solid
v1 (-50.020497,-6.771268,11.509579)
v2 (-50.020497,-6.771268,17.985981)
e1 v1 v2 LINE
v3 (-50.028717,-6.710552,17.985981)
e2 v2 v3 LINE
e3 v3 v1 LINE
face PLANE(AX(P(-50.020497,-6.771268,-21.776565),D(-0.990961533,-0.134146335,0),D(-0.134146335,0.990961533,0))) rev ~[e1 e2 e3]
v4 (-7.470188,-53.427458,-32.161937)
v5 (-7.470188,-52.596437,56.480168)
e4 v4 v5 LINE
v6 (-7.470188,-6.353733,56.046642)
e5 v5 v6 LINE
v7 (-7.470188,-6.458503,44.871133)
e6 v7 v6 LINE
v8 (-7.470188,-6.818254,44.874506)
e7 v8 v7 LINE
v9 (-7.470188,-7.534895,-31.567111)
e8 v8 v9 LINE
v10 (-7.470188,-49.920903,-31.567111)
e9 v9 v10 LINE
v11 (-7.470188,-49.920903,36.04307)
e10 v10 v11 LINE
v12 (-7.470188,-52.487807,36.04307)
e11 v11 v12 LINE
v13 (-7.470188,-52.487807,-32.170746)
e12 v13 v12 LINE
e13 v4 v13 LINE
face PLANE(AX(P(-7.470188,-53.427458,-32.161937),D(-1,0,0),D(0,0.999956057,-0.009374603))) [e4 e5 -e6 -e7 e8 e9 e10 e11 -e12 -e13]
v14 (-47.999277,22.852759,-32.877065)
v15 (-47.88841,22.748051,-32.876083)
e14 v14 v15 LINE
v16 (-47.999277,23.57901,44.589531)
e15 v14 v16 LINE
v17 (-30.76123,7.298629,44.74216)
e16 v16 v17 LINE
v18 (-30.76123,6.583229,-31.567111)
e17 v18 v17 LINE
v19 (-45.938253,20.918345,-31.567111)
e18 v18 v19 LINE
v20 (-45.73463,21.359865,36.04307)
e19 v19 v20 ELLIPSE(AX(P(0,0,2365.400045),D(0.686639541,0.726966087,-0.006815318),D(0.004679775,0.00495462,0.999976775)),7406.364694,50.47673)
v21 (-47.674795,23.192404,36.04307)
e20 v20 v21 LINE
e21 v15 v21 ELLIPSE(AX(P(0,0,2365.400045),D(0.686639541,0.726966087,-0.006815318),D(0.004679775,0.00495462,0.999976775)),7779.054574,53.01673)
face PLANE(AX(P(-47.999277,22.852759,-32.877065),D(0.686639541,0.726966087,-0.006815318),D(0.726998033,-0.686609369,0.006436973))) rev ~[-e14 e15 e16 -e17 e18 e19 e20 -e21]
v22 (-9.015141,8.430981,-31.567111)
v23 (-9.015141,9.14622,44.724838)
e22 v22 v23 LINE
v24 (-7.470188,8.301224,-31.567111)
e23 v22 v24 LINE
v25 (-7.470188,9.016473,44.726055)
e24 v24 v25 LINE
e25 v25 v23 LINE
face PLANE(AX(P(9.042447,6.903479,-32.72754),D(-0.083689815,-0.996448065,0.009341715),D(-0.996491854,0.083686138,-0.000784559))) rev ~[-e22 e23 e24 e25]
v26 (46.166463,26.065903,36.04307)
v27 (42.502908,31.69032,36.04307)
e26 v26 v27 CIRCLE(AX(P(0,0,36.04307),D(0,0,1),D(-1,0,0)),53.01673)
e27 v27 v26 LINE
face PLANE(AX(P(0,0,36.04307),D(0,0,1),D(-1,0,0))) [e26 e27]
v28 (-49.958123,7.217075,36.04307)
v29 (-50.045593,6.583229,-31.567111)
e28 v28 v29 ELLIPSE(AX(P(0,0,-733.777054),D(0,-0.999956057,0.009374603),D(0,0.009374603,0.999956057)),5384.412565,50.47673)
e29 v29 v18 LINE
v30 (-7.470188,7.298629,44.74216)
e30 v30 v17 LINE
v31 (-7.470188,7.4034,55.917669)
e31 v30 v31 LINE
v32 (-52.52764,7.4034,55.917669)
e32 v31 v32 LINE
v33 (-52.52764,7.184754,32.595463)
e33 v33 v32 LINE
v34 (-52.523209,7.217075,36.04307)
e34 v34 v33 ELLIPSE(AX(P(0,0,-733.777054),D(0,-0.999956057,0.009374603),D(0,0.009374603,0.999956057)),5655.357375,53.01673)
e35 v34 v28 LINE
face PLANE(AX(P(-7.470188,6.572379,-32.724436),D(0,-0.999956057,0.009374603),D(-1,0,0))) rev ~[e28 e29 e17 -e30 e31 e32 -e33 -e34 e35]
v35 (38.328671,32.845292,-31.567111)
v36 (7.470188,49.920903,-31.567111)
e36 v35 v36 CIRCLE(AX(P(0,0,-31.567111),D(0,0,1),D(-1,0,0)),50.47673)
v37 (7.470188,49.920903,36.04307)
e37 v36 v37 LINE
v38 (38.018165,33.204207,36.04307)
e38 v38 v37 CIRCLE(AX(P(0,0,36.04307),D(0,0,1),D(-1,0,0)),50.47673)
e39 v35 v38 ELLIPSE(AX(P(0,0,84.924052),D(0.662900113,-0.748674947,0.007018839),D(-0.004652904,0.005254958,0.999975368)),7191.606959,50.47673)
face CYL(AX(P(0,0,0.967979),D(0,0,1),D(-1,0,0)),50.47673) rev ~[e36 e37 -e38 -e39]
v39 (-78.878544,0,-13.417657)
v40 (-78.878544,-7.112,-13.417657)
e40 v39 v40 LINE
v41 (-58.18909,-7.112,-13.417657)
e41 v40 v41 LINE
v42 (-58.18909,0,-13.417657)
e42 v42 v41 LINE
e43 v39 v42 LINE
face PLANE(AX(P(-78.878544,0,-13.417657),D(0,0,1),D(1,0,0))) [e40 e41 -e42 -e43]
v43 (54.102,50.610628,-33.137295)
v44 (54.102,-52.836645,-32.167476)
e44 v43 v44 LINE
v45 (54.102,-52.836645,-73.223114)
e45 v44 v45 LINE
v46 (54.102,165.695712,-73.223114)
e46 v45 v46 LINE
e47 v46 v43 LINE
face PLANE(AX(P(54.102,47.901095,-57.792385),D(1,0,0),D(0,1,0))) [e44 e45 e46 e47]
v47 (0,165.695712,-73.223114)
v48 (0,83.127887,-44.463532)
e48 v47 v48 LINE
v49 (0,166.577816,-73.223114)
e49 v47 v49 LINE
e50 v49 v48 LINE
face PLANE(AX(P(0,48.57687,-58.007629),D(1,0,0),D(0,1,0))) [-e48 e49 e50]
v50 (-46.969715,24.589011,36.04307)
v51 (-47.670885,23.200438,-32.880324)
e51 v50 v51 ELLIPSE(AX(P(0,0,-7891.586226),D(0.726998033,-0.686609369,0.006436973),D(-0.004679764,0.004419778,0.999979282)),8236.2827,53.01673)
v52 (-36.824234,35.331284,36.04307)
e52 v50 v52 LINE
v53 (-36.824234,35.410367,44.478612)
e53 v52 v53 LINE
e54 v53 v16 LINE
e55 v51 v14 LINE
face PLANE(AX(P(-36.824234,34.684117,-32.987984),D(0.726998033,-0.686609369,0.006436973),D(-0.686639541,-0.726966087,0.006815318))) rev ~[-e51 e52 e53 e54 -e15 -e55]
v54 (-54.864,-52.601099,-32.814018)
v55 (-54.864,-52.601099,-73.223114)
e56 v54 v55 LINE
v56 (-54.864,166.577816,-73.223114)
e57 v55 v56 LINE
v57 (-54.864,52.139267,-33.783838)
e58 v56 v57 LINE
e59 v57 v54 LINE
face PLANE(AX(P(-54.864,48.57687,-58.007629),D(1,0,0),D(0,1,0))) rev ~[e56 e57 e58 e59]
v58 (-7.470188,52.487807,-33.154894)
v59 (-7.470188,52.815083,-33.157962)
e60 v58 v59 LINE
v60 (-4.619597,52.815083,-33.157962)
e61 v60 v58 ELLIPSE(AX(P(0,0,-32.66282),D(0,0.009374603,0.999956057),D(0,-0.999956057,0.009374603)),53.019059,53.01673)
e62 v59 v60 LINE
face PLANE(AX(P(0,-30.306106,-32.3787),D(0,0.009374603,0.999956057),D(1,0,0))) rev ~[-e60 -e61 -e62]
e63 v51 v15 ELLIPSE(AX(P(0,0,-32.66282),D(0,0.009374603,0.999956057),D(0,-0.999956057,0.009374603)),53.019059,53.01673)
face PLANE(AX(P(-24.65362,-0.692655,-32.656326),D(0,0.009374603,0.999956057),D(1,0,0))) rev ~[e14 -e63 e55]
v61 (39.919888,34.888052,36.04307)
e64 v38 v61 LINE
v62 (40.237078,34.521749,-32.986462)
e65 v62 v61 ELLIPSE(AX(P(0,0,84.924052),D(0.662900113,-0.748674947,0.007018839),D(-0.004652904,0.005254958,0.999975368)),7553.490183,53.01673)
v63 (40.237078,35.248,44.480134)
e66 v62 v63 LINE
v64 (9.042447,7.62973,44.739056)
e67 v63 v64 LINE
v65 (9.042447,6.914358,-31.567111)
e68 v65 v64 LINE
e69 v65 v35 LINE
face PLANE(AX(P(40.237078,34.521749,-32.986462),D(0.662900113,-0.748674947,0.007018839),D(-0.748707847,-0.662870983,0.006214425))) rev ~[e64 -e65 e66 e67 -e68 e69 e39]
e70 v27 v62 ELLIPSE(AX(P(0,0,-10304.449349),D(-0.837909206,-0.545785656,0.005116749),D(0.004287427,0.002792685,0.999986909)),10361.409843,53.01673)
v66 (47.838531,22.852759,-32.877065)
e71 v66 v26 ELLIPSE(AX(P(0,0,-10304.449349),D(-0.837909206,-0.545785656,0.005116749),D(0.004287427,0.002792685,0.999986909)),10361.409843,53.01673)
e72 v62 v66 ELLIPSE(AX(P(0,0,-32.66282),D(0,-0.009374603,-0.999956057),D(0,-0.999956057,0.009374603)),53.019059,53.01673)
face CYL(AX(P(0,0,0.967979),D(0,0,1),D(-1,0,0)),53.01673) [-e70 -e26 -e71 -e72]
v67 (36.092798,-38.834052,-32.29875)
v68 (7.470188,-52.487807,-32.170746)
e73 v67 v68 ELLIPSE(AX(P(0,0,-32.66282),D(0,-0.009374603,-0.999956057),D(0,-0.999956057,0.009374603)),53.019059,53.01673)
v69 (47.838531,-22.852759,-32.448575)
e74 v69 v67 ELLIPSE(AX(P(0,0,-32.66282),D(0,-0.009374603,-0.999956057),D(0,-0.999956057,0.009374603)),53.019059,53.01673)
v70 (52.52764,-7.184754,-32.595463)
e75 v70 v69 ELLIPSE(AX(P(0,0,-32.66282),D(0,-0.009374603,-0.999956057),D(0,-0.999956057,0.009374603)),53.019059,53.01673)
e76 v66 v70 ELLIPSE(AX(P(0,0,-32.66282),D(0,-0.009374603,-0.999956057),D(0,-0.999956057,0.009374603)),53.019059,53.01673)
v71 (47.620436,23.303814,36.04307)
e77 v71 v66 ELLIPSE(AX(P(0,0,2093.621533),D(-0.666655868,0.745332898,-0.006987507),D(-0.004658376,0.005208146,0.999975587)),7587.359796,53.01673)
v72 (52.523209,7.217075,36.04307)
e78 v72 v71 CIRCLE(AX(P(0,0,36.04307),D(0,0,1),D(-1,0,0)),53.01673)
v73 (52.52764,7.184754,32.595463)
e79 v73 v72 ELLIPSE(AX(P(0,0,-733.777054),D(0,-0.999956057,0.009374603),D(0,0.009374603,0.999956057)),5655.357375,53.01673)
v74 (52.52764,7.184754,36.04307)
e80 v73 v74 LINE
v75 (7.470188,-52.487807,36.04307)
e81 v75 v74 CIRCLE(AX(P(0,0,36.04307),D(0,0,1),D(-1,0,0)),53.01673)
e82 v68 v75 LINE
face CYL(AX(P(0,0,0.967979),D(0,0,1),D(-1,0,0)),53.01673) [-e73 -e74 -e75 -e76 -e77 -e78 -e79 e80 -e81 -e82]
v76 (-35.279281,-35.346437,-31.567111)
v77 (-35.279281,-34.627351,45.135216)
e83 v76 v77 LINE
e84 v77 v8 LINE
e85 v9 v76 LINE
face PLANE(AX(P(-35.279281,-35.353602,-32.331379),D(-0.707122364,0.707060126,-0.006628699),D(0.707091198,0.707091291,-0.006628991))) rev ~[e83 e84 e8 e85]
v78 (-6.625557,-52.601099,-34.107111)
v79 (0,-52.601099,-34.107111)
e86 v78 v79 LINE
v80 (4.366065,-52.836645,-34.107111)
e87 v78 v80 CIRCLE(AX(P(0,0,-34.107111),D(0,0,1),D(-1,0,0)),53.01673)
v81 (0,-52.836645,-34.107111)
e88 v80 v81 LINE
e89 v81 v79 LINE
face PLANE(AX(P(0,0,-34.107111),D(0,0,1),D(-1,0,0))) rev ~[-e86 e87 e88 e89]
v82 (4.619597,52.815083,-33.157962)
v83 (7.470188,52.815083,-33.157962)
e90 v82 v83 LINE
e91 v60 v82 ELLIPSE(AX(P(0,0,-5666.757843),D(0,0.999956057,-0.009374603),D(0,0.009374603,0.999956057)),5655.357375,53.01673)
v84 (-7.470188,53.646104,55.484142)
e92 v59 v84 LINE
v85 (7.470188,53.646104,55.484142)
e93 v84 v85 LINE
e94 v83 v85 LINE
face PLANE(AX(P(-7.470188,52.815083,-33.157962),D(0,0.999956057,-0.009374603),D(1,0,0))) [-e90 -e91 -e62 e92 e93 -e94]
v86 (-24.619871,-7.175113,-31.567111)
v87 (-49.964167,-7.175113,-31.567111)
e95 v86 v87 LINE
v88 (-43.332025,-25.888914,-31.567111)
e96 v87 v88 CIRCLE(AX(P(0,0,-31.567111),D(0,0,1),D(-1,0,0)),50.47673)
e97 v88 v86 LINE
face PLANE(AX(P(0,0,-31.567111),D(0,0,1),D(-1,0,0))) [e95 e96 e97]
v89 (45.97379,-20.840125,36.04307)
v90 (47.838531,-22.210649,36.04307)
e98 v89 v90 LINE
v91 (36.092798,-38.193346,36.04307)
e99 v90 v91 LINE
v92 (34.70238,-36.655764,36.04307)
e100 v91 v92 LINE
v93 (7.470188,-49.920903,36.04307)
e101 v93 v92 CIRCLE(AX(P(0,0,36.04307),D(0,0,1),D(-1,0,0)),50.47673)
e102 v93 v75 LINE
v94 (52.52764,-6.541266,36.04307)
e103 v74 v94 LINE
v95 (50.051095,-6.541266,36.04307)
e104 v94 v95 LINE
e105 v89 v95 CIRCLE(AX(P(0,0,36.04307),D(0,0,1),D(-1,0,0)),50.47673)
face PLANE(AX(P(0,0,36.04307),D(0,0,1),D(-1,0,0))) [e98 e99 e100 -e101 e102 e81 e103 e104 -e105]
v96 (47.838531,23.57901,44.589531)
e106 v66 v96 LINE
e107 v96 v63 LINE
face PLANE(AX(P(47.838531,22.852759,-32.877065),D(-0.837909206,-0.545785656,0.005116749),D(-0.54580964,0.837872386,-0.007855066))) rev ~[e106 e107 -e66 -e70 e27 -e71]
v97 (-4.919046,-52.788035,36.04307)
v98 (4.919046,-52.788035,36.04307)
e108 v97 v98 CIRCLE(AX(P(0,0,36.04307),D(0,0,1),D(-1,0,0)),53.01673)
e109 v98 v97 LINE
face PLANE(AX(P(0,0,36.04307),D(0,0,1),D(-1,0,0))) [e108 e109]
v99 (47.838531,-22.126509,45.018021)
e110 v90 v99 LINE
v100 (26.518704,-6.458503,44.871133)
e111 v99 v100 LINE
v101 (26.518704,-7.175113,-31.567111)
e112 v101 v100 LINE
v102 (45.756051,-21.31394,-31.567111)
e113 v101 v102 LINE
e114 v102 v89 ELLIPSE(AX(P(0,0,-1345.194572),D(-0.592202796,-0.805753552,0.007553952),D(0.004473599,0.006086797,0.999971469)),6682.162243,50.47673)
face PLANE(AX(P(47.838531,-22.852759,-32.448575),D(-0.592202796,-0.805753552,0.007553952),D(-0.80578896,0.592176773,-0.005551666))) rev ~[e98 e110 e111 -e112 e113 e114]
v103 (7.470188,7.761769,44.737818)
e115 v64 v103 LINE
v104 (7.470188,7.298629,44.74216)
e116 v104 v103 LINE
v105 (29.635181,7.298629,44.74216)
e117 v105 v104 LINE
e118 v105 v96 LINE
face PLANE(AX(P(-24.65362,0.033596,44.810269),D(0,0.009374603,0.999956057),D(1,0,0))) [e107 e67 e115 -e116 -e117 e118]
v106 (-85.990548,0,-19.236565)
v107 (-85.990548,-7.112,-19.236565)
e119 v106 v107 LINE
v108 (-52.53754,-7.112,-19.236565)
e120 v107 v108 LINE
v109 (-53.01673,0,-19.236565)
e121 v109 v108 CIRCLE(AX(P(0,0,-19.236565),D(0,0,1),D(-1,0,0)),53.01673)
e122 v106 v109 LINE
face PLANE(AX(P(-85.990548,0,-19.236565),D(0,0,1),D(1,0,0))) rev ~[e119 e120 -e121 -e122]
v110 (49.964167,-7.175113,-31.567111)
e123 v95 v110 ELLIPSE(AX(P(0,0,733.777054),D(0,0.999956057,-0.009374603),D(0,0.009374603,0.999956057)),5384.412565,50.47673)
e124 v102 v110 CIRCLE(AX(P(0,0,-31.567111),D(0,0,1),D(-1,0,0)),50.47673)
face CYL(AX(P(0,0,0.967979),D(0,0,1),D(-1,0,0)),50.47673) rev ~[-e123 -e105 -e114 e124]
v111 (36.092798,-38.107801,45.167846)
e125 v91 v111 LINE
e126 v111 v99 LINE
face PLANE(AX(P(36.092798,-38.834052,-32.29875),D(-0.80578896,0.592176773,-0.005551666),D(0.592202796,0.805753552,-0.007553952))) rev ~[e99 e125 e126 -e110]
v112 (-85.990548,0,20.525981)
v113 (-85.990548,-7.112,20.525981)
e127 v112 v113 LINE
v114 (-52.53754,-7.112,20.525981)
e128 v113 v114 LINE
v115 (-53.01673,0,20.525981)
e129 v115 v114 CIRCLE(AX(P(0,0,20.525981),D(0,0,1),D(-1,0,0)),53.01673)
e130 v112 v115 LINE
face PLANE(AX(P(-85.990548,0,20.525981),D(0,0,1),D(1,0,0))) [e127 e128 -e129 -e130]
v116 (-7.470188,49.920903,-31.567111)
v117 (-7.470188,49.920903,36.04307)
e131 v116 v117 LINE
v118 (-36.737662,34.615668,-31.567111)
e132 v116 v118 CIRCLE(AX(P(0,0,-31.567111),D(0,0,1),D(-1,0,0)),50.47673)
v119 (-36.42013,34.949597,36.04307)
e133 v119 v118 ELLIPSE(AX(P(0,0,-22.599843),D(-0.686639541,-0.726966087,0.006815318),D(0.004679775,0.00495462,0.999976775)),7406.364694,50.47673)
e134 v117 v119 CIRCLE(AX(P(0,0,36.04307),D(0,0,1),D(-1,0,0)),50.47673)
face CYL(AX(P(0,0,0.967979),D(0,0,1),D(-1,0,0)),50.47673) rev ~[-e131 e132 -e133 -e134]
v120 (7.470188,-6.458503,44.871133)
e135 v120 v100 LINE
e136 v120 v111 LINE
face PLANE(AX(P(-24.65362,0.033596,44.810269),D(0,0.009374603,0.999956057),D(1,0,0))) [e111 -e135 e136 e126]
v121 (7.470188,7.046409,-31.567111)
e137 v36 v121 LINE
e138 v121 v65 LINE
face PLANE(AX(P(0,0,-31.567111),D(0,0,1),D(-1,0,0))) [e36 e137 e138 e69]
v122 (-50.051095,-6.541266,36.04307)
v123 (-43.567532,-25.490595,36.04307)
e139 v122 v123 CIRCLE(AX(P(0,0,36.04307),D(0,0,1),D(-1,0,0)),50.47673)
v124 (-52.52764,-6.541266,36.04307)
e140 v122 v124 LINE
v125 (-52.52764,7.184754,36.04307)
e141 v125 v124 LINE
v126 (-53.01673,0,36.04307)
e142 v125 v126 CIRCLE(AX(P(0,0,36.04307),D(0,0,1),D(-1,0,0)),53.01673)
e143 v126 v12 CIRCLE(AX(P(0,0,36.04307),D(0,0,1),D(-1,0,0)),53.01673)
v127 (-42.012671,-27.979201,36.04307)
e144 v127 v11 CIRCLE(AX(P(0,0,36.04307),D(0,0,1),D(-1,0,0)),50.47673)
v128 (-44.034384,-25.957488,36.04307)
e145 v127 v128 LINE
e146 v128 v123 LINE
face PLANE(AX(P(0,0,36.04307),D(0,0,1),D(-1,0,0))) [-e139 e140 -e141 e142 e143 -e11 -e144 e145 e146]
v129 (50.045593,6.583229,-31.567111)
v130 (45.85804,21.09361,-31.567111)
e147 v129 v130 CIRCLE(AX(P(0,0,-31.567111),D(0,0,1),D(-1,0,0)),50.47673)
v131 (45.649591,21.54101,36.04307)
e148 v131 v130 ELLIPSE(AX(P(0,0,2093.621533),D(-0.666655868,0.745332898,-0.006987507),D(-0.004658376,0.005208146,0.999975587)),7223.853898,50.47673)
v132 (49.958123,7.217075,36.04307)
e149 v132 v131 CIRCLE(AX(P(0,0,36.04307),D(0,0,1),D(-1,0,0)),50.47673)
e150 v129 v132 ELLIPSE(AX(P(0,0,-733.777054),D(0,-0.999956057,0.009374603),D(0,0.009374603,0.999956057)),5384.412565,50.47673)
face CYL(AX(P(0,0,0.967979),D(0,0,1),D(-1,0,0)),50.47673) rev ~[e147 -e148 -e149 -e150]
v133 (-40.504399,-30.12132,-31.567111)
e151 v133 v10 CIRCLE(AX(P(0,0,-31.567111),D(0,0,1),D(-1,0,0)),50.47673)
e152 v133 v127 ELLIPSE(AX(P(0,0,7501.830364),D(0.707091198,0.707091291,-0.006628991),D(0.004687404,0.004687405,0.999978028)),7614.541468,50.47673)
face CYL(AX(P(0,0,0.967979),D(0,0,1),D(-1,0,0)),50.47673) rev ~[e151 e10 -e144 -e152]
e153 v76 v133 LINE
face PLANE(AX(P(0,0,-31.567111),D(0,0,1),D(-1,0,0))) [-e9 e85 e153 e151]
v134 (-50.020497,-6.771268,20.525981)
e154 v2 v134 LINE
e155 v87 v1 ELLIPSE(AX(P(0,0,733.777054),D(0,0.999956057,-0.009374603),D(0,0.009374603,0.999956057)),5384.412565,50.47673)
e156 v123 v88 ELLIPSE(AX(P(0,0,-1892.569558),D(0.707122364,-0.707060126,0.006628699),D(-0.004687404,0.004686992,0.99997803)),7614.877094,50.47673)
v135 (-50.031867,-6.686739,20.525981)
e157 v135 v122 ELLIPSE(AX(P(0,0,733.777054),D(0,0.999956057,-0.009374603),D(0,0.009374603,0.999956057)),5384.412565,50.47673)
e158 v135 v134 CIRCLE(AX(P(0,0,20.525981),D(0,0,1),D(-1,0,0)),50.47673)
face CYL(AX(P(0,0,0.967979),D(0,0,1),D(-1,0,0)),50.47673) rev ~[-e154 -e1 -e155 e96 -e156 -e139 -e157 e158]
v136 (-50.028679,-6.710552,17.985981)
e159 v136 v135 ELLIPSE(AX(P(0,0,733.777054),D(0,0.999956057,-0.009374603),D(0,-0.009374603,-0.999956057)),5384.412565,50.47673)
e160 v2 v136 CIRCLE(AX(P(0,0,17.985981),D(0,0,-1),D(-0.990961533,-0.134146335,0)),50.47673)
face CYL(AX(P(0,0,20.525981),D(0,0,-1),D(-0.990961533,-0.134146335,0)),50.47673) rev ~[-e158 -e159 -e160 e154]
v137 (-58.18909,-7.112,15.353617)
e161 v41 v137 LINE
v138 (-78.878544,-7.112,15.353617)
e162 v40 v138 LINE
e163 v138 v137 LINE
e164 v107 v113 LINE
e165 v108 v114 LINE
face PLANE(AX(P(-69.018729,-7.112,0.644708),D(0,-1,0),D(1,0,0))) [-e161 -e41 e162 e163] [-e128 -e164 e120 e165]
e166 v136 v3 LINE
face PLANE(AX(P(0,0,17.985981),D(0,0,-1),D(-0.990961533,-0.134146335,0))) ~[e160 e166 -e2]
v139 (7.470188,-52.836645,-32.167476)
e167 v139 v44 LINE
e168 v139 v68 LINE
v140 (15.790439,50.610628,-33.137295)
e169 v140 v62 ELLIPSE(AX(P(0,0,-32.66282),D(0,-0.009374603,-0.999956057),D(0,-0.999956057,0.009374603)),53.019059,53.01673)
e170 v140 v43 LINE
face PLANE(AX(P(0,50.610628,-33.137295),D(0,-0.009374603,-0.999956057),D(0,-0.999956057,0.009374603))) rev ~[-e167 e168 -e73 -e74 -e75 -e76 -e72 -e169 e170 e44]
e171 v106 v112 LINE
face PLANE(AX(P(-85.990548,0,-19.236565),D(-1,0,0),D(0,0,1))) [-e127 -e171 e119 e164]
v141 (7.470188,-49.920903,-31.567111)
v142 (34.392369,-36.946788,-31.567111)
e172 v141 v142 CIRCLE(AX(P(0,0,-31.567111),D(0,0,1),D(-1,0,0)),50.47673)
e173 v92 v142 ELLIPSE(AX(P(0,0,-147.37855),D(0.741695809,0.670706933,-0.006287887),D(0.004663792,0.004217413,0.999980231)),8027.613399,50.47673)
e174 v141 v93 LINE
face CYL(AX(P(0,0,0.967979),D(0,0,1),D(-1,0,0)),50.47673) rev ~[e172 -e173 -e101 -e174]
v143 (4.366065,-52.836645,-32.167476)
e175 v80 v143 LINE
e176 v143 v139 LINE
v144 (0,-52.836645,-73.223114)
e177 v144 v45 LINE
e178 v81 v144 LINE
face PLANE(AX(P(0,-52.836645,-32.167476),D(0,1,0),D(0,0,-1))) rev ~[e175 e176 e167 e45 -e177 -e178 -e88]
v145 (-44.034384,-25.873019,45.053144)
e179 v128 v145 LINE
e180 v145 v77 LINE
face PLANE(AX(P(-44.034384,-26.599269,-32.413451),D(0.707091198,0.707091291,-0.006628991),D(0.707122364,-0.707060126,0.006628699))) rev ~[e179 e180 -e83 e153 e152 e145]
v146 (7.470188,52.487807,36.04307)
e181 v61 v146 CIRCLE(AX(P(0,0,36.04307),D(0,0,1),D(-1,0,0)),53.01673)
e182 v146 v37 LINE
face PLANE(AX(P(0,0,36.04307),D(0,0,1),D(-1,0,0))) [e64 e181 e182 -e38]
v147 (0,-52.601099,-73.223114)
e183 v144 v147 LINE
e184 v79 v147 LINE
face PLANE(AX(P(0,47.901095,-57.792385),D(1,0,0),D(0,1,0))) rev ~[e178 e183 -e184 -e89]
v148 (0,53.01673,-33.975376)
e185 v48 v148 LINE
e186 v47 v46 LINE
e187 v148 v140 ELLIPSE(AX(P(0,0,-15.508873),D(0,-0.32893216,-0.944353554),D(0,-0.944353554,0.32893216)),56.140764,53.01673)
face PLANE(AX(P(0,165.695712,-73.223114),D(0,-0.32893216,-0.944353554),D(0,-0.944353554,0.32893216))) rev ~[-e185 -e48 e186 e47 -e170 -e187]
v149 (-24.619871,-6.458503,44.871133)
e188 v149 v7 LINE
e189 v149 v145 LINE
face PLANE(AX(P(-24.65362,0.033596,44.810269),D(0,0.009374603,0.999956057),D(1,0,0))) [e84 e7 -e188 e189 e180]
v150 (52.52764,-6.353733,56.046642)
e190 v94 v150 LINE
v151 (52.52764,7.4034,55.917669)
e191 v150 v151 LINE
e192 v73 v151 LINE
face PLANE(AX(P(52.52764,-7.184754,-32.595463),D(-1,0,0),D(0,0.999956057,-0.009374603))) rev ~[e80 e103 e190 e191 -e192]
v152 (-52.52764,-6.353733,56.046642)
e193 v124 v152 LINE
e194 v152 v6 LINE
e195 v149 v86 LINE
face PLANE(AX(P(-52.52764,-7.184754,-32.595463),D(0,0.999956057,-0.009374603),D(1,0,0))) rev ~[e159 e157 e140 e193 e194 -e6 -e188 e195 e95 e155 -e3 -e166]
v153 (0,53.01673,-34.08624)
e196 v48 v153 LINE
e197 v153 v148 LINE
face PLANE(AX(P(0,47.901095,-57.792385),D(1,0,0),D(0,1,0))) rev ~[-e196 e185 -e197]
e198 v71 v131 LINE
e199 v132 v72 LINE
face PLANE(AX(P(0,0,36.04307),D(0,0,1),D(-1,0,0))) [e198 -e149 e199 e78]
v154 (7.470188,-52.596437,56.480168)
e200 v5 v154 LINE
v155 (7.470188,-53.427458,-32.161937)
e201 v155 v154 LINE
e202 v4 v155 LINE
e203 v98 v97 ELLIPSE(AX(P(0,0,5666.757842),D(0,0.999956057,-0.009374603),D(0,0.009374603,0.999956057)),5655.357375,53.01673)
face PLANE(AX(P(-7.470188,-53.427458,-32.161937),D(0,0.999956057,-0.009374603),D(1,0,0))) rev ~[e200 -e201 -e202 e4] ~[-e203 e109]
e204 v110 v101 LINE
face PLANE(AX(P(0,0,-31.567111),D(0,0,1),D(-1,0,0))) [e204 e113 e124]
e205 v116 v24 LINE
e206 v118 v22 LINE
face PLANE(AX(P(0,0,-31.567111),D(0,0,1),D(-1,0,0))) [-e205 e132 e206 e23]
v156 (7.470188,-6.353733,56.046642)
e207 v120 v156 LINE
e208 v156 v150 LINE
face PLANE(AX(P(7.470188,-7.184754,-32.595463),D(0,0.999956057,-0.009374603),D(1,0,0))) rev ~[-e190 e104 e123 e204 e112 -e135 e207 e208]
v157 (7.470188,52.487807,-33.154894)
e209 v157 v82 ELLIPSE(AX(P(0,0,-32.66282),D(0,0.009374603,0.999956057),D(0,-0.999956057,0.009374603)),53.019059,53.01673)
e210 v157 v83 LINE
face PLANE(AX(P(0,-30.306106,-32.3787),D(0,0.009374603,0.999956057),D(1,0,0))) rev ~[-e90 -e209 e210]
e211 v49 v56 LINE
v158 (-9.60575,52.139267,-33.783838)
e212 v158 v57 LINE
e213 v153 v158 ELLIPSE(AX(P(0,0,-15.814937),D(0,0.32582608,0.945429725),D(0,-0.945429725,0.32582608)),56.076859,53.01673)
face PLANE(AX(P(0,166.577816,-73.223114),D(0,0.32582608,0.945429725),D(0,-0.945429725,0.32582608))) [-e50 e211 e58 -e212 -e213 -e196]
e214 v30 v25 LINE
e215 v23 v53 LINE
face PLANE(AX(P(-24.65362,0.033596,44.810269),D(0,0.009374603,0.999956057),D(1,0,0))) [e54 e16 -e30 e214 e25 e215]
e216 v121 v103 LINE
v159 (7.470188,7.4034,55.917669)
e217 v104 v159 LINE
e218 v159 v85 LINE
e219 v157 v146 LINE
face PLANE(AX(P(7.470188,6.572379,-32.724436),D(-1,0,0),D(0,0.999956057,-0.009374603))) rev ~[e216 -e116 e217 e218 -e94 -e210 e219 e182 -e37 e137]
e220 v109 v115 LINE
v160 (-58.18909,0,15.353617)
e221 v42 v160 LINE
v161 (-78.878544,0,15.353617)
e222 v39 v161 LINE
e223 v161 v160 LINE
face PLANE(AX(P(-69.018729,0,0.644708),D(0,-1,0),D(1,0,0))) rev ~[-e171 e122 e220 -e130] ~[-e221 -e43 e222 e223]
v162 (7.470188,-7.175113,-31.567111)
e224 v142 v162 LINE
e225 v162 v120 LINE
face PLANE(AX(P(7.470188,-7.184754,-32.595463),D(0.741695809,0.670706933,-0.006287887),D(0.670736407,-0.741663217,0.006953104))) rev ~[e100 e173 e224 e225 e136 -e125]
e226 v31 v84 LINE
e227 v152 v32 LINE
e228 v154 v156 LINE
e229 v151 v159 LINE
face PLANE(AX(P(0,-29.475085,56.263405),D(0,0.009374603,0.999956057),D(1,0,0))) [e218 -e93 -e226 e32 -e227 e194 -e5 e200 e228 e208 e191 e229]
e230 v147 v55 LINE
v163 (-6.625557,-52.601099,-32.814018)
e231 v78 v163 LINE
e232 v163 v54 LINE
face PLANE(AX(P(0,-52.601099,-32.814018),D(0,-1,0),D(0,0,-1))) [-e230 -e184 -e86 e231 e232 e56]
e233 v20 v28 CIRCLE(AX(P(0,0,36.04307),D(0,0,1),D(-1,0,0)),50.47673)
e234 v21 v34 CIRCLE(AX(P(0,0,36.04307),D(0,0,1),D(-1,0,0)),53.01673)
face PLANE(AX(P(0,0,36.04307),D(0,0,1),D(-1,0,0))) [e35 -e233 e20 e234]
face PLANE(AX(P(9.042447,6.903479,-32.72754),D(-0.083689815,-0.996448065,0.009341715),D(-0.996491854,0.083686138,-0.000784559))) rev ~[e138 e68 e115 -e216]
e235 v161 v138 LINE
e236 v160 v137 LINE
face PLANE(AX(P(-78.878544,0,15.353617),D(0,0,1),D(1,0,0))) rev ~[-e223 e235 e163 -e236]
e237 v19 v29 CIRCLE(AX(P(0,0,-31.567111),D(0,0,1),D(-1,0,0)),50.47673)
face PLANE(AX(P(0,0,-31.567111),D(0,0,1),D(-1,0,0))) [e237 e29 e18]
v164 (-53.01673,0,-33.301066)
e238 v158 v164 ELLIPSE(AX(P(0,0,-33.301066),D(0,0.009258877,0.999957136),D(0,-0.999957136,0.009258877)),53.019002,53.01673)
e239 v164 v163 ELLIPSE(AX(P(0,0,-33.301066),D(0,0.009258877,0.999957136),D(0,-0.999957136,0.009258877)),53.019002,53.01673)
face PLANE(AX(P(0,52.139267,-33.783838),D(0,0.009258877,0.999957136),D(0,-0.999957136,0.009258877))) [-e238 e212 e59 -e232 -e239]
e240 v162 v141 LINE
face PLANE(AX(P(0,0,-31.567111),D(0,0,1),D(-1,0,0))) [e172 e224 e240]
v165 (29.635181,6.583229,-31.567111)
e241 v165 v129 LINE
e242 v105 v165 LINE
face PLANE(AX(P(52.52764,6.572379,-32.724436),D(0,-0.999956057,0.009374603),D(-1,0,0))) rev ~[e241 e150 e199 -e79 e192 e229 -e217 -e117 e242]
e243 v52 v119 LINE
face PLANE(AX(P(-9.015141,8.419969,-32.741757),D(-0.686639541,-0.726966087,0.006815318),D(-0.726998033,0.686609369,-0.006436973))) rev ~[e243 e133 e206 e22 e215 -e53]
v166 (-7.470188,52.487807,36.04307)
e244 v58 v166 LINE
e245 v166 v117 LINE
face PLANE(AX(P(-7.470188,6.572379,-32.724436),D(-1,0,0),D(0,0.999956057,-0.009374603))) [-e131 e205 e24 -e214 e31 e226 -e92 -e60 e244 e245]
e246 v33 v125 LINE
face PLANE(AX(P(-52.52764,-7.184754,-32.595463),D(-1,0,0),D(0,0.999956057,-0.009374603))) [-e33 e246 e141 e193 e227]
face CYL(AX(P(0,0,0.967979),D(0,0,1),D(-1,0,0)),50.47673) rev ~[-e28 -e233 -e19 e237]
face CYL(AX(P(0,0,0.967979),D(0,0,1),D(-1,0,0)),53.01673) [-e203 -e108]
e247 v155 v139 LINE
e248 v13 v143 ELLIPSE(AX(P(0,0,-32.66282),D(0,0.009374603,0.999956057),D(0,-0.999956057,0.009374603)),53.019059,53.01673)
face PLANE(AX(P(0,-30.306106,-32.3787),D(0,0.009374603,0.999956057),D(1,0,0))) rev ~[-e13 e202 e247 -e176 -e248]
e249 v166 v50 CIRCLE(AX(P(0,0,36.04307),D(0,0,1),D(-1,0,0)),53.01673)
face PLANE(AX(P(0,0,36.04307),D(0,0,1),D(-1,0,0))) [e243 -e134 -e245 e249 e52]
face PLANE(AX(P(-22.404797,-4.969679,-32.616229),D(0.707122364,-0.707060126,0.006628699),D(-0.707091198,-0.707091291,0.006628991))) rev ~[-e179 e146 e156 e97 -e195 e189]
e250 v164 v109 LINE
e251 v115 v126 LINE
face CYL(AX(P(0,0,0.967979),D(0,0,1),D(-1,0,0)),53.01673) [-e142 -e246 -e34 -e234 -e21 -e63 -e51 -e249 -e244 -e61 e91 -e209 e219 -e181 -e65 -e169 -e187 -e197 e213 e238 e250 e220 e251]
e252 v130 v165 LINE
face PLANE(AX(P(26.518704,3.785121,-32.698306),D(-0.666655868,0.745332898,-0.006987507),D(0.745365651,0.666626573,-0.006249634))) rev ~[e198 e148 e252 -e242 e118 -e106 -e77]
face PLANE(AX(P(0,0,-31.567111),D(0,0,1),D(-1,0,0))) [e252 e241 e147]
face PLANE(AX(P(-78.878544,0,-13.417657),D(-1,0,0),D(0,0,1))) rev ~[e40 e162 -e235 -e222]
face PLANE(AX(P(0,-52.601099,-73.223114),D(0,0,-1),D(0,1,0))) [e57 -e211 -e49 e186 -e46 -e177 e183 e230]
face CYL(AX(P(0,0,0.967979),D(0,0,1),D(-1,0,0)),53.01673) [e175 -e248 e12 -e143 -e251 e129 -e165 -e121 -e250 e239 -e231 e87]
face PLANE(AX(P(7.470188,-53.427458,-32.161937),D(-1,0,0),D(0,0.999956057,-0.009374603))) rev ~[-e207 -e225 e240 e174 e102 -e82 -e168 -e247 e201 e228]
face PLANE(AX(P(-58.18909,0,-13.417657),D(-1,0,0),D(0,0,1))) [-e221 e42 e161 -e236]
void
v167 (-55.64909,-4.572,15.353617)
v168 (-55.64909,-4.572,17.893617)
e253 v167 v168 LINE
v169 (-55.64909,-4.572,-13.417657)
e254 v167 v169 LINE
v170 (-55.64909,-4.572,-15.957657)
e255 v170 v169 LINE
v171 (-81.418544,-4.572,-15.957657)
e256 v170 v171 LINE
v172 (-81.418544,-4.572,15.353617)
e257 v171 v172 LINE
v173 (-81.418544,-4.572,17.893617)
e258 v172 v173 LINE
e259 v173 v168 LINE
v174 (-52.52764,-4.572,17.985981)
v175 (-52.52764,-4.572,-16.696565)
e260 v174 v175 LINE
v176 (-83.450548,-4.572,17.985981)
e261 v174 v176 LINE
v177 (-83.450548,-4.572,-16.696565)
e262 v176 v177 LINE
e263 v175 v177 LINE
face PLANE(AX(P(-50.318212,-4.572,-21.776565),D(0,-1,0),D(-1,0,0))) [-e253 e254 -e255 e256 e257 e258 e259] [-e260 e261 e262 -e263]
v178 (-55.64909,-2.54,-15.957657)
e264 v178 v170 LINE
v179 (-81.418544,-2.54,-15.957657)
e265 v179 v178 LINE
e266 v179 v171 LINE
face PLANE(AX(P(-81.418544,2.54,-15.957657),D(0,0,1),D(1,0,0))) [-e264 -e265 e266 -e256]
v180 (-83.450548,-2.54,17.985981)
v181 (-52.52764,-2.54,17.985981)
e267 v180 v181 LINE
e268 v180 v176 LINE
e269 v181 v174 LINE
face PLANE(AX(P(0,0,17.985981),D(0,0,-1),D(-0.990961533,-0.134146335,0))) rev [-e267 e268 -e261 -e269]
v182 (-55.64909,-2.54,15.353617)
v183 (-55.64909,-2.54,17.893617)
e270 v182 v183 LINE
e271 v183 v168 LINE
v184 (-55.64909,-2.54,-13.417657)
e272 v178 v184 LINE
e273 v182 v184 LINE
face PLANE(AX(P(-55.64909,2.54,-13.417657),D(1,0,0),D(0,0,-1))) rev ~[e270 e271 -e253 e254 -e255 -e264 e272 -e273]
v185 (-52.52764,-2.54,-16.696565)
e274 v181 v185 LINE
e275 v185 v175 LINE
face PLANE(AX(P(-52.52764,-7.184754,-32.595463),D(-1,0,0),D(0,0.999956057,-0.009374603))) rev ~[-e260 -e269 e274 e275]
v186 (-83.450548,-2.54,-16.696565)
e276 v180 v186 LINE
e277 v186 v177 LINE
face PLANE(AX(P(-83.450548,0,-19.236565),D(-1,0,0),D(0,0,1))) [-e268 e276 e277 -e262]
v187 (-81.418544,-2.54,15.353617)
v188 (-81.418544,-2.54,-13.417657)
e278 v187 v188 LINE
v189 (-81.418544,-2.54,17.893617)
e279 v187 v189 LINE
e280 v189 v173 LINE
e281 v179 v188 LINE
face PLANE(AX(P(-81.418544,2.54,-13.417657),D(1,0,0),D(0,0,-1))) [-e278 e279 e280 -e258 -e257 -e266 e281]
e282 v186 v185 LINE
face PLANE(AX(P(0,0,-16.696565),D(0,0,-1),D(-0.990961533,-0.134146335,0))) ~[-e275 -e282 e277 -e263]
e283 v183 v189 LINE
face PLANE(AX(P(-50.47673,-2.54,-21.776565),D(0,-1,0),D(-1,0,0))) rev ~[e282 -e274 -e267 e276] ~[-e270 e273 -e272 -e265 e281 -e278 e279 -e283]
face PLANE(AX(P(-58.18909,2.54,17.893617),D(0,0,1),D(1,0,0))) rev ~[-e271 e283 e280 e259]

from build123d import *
from build123d import SkipClean  # not in build123d's __all__

# Parameters (mm, degrees)
F0_W         = 53.0167296529
F0_H         = 70.1501816511
F2_W         = 33.9436382055
F2_H         = 39.762545377
F2_W_2       = 20.6894539297
F2_H_2       = 28.7712737918
F3_DEPTH     = 7.112
F4_T         = 2.54
F4_T3_DEPTH  = 44.842545377
F4_T5_DEPTH  = 12.192
F4_T8_ANGLE  = 7.7092595128
F4_T10_ANGLE = 7.7092595128
F6_DEPTH     = 54.102
F8_DEPTH     = 54.864
F9_W         = 14.9403763935
F9_H         = 46.2447360097
F9_W_2       = 45.0574515454
F9_H_2       = 13.7577369931
F10_DEPTH    = 88.646
F12_DEPTH    = 77.47


# Not quite as in the source:
# - a shell that OpenCascade refuses in one call is made with other operations: the cavity is built on its own and cut out


with BuildPart() as f1:
    # F0 (on Front) → F1 (revolve)
    with BuildSketch(Plane.XZ):
        with Locations((-26.5083648264, 0.9679794312)):
            Rectangle(F0_W, F0_H)
    revolve(axis=Axis((0, 0, 0.9679794312), (0, 0, 1)))

    # F2 (on Front) → F3 (join)
    with BuildSketch(Plane.XZ):
        with Locations((-69.0187290311, 0.6447080523)):
            Rectangle(F2_W, F2_H)
        with Locations((-68.5338173062, 0.9679803625)):
            Rectangle(F2_W_2, F2_H_2, mode=Mode.SUBTRACT)
    extrude(amount=F3_DEPTH)

    # F4: shell of thickness 2.54, made by hand


with BuildPart() as f4_core1:
    # F4_t2: copy of F1
    add(f1.part, clean=False)

    # the walls: a layer under each face that stays
    f4_faces = [f4_core1.faces().sort_by_distance(p)[0] for p in [
        (0, 0, -34.1071113944),
        (53.0167296529, 0, 0.9679794312),
        (-69.2640439234, -3.556, 20.5259807408),
        (-80.4150467304, -7.112, -12.6094737401),
        (-69.2640439234, -3.556, -19.2365646362),
        (-80.4949117204, 0, -12.6094737401),
        (-85.9905481339, -3.556, 0.6447080523),
        (-68.5338173062, -3.556, 15.3536172584),
        (-78.878544271, -3.556, 0.9679803625),
        (-58.1890903413, -3.556, 0.9679803625),
        (-68.5338173062, -3.556, -13.4176565334),
    ]]
    thicken(f4_faces, amount=-F4_T, mode=Mode.SUBTRACT)

    # F4_s4 → F4_t3 (cut)
    with BuildSketch(Plane.XY.offset(-21.7765646362)):
        Polygon((-52.5627101359, -7.1408073169), (-50.0204974181, -6.771268308), (-50.3182120863, -4.572), (-52.5375397129, -4.572), align=None)
        Polygon((-53.0421296529, 0.0254), (-50.4767296529, 0), (-50.4767296529, -2.54), (-53.0167296529, -2.54), align=None)
    extrude(amount=F4_T3_DEPTH, mode=Mode.SUBTRACT)

    # F4_s6 → F4_t5 (cut)
    with BuildSketch(Plane.XZ.offset(-2.54)):
        Polygon((-78.853144271, 15.3282172584), (-78.878544271, 17.8936172584), (-81.418544271, 17.8936172584), (-81.418544271, 15.3536172584), align=None)
        Polygon((-58.2144903413, 15.3282172584), (-58.1890903413, 17.8936172584), (-55.6490903413, 17.8936172584), (-55.6490903413, 15.3536172584), align=None)
        Polygon((-78.853144271, -13.3922565334), (-81.418544271, -13.4176565334), (-81.418544271, -15.9576565334), (-78.878544271, -15.9576565334), align=None)
        Polygon((-58.2144903413, -13.3922565334), (-55.6490903413, -13.4176565334), (-55.6490903413, -15.9576565334), (-58.1890903413, -15.9576565334), align=None)
    extrude(amount=F4_T5_DEPTH, mode=Mode.SUBTRACT)

    # F4_s7 → F4_t8 (revolve, cut)
    with BuildSketch(Plane(origin=(0, 0, 0), x_dir=(0, 0, 1), z_dir=(0.1341463354, -0.9909615334, 0))):
        Polygon((20.5513807408, 53.0421296529), (20.5259807408, 50.4767296529), (17.9859807408, 50.4767296529), (17.9859807408, 53.0167296529), align=None)
    revolve(axis=Axis((0, 0, 20.5259807408), (0, 0, -1)), revolution_arc=F4_T8_ANGLE, mode=Mode.SUBTRACT)

    # F4_s9 → F4_t10 (revolve, cut)
    with BuildSketch(Plane(origin=(0, 0, 0), x_dir=(0, 0, 1), z_dir=(0.1341463354, -0.9909615334, 0))):
        Polygon((-19.2619646362, 53.0421296529), (-19.2365646362, 50.4767296529), (-16.6965646362, 50.4767296529), (-16.6965646362, 53.0167296529), align=None)
    revolve(axis=Axis((0, 0, -19.2365646362), (0, 0, -1)), revolution_arc=F4_T10_ANGLE, mode=Mode.SUBTRACT)


with BuildPart() as f1_1:
    add(f1.part, clean=False)

    # what is left inside the walls is the cavity
    f4_cavity = [f4_core1.part.solids().sort_by_distance(p)[0] for p in [
        (50.3372, 3.391603, 13.506343),
    ]]
    add(f4_cavity, mode=Mode.SUBTRACT)

    # F5 (on Right) → F6 (join)
    with BuildSketch(Plane.YZ):
        Polygon((50.610627979, -33.1372953951), (-52.8366453946, -32.1674756706), (-52.8366453946, -73.2231140137), (165.6957119703, -73.2231140137), align=None)
    extrude(amount=F6_DEPTH)

    # F7 (on Right) → F8 (join)
    with BuildSketch(Plane.YZ):
        Polygon((52.1392673254, -33.7838381529), (-52.6010990143, -32.8140184283), (-52.6010990143, -73.2231140137), (166.5778160095, -73.2231140137), align=None)
    extrude(amount=-F8_DEPTH)

    # F9 (on face) → F10 (join)
    with BuildSketch(Plane(origin=(0, -0.3061875117, -32.6599494936), x_dir=(1, 0, 0), z_dir=(0, 0.0093746029, 0.9999560574))):
        with Locations((0, -30.0012365014)):
            Rectangle(F9_W, F9_H)
        with Locations((-29.9989139694, 0)):
            Rectangle(F9_W_2, F9_H_2)
        Rectangle(F9_W, F9_H_2)
        with Locations((29.9989139694, 0)):
            Rectangle(F9_W_2, F9_H_2)
        with Locations((0, 30.0012365014)):
            Rectangle(F9_W, F9_H)
    with SkipClean():  # cleaning this boolean's faces spoils the solid; the shape is the same uncleaned
        extrude(amount=F10_DEPTH)

    # F11 (on face) → F12 (join)
    with BuildSketch(Plane(origin=(0, -0.3061875117, -32.6599494936), x_dir=(1, 0, 0), z_dir=(0, 0.0093746029, 0.9999560574))):
        Polygon((-35.2792814374, -35.0489541888), (-6.9552087225, -6.723633036), (7.4701881967, -6.8788684965), (-9.015141055, 8.7265400216), (-36.82423383, 34.9918417633), (-47.9992774731, 23.1599645401), (-27.8100166411, 4.0914881974), (-22.4047969755, -4.6636964383), (-44.0343843394, -26.2942371678), align=None)
        Polygon((9.0424474554, 7.2099834745), (7.4701881967, -6.8788684965), (36.0927975577, -38.5295574829), (47.8385306477, -22.5475626063), (26.5187043697, -6.8788684965), (26.5187043697, 4.0914881974), (47.8385306477, 23.1599645401), (40.2370781386, 34.8294671803), align=None)
        Polygon((-9.015141055, 8.7265400216), (7.4701881967, -6.8788684965), (9.0424474554, 7.2099834745), align=None)
    with SkipClean():  # cleaning this boolean's faces spoils the solid; the shape is the same uncleaned
        extrude(amount=F12_DEPTH)


solid = f1_1.part
